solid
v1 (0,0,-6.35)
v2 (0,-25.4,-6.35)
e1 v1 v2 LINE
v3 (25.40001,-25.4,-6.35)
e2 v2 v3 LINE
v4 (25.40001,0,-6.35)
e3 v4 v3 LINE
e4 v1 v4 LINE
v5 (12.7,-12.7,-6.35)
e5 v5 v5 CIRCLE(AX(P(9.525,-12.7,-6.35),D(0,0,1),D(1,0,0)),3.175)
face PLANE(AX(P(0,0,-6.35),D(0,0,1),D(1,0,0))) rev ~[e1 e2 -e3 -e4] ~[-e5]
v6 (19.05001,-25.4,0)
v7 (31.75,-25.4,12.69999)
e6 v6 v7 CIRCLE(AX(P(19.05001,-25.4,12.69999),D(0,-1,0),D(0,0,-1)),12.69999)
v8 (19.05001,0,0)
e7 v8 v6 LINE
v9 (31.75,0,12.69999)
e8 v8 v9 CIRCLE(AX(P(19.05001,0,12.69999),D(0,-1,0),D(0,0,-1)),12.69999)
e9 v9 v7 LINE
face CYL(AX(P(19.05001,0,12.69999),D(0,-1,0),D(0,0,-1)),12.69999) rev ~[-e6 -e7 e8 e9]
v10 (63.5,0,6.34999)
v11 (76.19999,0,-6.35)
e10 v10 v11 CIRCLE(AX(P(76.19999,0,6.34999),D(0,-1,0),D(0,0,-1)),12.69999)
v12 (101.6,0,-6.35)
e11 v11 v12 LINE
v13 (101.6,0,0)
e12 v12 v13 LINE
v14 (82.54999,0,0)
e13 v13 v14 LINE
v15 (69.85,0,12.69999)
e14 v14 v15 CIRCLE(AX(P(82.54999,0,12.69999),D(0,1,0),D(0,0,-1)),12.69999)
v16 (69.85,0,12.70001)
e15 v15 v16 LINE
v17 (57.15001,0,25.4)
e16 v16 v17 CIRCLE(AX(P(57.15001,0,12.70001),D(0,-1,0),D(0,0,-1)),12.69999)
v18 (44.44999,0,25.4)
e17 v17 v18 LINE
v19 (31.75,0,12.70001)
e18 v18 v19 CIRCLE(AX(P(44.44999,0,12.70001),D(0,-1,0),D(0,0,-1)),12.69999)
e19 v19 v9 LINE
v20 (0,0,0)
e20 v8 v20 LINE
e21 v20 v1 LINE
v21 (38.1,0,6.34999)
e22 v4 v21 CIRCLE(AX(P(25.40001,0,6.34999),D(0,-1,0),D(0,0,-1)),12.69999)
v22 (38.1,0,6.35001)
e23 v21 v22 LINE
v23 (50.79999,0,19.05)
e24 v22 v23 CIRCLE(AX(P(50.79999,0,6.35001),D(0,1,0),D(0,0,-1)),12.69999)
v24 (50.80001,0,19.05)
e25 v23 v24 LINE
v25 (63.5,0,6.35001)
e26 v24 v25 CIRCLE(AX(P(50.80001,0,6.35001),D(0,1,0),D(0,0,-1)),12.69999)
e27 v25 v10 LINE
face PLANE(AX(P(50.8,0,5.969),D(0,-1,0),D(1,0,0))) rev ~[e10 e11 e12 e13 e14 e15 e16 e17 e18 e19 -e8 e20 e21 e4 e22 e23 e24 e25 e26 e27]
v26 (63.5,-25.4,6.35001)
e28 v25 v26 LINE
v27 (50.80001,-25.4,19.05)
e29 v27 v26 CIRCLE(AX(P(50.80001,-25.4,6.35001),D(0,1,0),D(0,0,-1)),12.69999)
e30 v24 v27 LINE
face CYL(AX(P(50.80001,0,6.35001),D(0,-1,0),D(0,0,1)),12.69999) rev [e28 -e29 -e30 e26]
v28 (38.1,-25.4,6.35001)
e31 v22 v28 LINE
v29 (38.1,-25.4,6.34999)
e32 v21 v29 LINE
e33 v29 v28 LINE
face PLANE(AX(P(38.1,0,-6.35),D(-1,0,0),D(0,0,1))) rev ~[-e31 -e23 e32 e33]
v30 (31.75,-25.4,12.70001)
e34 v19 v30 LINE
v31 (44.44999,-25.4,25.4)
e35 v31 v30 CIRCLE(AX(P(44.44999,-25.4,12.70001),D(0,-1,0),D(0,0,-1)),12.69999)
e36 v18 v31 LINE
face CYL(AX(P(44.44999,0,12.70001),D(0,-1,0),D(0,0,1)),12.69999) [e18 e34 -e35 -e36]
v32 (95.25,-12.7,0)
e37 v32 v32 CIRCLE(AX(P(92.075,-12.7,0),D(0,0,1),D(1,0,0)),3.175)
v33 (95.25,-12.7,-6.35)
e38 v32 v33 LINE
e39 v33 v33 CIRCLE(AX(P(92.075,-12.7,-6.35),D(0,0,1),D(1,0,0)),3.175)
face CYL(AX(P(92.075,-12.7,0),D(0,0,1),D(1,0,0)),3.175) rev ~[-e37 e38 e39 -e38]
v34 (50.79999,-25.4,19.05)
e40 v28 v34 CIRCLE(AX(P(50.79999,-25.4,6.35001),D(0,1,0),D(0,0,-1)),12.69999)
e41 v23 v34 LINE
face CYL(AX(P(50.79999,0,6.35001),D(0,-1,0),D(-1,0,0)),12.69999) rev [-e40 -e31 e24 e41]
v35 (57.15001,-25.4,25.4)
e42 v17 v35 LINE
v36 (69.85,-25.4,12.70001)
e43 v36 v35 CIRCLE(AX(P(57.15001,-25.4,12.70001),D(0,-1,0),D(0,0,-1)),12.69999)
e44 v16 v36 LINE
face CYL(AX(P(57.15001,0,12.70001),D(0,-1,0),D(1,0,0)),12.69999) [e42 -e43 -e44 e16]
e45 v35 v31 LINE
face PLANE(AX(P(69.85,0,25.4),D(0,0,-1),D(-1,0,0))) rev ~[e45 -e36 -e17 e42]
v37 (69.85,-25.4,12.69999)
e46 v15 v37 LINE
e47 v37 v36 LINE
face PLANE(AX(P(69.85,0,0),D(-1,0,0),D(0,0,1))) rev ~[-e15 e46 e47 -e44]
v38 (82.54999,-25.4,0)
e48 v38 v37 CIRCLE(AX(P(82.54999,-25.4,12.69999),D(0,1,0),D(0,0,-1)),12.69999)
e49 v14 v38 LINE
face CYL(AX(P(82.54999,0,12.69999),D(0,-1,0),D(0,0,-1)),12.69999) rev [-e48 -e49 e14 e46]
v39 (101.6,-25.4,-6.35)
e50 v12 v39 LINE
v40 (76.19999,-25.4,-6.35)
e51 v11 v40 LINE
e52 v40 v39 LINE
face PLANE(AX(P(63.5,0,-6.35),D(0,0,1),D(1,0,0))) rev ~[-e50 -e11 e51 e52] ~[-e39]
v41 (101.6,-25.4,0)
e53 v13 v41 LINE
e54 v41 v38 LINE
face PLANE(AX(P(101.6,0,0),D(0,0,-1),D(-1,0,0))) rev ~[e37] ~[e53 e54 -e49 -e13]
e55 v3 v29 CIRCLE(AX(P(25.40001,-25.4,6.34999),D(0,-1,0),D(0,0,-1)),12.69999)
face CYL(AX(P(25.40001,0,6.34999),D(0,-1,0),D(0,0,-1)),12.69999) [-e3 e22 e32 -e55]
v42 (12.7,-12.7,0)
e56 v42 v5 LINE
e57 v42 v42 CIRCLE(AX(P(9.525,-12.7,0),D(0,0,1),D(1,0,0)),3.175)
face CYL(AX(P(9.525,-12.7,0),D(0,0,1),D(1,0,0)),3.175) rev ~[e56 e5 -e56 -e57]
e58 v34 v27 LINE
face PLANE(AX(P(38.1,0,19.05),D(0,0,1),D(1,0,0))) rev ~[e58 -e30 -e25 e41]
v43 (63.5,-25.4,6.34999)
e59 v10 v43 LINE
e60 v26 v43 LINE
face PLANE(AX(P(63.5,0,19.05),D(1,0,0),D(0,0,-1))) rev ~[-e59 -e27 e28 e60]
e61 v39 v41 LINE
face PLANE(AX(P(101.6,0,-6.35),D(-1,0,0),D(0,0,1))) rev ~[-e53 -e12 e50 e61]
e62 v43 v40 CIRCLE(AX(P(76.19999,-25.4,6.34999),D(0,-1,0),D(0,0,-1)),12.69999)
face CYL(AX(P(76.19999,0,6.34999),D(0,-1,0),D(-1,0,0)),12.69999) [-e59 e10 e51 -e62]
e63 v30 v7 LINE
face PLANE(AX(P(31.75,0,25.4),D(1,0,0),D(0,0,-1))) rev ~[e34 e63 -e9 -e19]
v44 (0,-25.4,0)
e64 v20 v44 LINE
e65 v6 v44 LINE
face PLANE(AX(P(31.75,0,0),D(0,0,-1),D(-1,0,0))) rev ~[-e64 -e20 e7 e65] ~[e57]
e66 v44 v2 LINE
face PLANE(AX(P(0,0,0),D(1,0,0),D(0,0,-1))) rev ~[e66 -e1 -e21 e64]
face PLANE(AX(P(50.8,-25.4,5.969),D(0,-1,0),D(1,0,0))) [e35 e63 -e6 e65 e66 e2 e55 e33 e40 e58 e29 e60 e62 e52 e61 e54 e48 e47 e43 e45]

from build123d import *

# Parameters (mm, degrees)
F1_DEPTH = 25.4
F2_R     = 12.69999
F3_R     = 3.175
F4_DEPTH = 6.351


# Not quite as in the source:
# - a fillet or chamfer is up to 0.001 mm smaller than in the source, because OpenCascade refuses the exact size


with BuildPart() as f1:
    # F0 (on Front) → F1 (new body)
    with BuildSketch(Plane.XZ):
        Polygon((31.75, 0), (0, 0), (0, -6.35), (38.1, -6.35), (38.1, 19.05), (63.5, 19.05), (63.5, -6.35), (101.6, -6.35), (101.6, 0), (69.85, 0), (69.85, 25.4), (31.75, 25.4), align=None)
    extrude(amount=F1_DEPTH)

    # F2 (radius 12.7 in the source; OpenCascade refuses exactly that, so slightly less here)
    f2_edges = [f1.edges().sort_by_distance(p)[0] for p in [
        (31.75, -12.7, 25.4),
        (38.1, -12.7, 19.05),
        (69.85, -12.7, 25.4),
        (63.5, -12.7, 19.05),
        (63.5, -12.7, -6.35),
        (69.85, -12.7, 0),
        (38.1, -12.7, -6.35),
        (31.75, -12.7, 0),
    ]]
    fillet(f2_edges, radius=F2_R)

    # F3 (on face) → F4 (cut, through all)
    with BuildSketch(Plane.XY):
        with Locations((9.525, -12.7)):
            Circle(F3_R)
        with Locations((92.075, -12.7)):
            Circle(F3_R)
    extrude(amount=-F4_DEPTH, mode=Mode.SUBTRACT)


solid = f1.part
